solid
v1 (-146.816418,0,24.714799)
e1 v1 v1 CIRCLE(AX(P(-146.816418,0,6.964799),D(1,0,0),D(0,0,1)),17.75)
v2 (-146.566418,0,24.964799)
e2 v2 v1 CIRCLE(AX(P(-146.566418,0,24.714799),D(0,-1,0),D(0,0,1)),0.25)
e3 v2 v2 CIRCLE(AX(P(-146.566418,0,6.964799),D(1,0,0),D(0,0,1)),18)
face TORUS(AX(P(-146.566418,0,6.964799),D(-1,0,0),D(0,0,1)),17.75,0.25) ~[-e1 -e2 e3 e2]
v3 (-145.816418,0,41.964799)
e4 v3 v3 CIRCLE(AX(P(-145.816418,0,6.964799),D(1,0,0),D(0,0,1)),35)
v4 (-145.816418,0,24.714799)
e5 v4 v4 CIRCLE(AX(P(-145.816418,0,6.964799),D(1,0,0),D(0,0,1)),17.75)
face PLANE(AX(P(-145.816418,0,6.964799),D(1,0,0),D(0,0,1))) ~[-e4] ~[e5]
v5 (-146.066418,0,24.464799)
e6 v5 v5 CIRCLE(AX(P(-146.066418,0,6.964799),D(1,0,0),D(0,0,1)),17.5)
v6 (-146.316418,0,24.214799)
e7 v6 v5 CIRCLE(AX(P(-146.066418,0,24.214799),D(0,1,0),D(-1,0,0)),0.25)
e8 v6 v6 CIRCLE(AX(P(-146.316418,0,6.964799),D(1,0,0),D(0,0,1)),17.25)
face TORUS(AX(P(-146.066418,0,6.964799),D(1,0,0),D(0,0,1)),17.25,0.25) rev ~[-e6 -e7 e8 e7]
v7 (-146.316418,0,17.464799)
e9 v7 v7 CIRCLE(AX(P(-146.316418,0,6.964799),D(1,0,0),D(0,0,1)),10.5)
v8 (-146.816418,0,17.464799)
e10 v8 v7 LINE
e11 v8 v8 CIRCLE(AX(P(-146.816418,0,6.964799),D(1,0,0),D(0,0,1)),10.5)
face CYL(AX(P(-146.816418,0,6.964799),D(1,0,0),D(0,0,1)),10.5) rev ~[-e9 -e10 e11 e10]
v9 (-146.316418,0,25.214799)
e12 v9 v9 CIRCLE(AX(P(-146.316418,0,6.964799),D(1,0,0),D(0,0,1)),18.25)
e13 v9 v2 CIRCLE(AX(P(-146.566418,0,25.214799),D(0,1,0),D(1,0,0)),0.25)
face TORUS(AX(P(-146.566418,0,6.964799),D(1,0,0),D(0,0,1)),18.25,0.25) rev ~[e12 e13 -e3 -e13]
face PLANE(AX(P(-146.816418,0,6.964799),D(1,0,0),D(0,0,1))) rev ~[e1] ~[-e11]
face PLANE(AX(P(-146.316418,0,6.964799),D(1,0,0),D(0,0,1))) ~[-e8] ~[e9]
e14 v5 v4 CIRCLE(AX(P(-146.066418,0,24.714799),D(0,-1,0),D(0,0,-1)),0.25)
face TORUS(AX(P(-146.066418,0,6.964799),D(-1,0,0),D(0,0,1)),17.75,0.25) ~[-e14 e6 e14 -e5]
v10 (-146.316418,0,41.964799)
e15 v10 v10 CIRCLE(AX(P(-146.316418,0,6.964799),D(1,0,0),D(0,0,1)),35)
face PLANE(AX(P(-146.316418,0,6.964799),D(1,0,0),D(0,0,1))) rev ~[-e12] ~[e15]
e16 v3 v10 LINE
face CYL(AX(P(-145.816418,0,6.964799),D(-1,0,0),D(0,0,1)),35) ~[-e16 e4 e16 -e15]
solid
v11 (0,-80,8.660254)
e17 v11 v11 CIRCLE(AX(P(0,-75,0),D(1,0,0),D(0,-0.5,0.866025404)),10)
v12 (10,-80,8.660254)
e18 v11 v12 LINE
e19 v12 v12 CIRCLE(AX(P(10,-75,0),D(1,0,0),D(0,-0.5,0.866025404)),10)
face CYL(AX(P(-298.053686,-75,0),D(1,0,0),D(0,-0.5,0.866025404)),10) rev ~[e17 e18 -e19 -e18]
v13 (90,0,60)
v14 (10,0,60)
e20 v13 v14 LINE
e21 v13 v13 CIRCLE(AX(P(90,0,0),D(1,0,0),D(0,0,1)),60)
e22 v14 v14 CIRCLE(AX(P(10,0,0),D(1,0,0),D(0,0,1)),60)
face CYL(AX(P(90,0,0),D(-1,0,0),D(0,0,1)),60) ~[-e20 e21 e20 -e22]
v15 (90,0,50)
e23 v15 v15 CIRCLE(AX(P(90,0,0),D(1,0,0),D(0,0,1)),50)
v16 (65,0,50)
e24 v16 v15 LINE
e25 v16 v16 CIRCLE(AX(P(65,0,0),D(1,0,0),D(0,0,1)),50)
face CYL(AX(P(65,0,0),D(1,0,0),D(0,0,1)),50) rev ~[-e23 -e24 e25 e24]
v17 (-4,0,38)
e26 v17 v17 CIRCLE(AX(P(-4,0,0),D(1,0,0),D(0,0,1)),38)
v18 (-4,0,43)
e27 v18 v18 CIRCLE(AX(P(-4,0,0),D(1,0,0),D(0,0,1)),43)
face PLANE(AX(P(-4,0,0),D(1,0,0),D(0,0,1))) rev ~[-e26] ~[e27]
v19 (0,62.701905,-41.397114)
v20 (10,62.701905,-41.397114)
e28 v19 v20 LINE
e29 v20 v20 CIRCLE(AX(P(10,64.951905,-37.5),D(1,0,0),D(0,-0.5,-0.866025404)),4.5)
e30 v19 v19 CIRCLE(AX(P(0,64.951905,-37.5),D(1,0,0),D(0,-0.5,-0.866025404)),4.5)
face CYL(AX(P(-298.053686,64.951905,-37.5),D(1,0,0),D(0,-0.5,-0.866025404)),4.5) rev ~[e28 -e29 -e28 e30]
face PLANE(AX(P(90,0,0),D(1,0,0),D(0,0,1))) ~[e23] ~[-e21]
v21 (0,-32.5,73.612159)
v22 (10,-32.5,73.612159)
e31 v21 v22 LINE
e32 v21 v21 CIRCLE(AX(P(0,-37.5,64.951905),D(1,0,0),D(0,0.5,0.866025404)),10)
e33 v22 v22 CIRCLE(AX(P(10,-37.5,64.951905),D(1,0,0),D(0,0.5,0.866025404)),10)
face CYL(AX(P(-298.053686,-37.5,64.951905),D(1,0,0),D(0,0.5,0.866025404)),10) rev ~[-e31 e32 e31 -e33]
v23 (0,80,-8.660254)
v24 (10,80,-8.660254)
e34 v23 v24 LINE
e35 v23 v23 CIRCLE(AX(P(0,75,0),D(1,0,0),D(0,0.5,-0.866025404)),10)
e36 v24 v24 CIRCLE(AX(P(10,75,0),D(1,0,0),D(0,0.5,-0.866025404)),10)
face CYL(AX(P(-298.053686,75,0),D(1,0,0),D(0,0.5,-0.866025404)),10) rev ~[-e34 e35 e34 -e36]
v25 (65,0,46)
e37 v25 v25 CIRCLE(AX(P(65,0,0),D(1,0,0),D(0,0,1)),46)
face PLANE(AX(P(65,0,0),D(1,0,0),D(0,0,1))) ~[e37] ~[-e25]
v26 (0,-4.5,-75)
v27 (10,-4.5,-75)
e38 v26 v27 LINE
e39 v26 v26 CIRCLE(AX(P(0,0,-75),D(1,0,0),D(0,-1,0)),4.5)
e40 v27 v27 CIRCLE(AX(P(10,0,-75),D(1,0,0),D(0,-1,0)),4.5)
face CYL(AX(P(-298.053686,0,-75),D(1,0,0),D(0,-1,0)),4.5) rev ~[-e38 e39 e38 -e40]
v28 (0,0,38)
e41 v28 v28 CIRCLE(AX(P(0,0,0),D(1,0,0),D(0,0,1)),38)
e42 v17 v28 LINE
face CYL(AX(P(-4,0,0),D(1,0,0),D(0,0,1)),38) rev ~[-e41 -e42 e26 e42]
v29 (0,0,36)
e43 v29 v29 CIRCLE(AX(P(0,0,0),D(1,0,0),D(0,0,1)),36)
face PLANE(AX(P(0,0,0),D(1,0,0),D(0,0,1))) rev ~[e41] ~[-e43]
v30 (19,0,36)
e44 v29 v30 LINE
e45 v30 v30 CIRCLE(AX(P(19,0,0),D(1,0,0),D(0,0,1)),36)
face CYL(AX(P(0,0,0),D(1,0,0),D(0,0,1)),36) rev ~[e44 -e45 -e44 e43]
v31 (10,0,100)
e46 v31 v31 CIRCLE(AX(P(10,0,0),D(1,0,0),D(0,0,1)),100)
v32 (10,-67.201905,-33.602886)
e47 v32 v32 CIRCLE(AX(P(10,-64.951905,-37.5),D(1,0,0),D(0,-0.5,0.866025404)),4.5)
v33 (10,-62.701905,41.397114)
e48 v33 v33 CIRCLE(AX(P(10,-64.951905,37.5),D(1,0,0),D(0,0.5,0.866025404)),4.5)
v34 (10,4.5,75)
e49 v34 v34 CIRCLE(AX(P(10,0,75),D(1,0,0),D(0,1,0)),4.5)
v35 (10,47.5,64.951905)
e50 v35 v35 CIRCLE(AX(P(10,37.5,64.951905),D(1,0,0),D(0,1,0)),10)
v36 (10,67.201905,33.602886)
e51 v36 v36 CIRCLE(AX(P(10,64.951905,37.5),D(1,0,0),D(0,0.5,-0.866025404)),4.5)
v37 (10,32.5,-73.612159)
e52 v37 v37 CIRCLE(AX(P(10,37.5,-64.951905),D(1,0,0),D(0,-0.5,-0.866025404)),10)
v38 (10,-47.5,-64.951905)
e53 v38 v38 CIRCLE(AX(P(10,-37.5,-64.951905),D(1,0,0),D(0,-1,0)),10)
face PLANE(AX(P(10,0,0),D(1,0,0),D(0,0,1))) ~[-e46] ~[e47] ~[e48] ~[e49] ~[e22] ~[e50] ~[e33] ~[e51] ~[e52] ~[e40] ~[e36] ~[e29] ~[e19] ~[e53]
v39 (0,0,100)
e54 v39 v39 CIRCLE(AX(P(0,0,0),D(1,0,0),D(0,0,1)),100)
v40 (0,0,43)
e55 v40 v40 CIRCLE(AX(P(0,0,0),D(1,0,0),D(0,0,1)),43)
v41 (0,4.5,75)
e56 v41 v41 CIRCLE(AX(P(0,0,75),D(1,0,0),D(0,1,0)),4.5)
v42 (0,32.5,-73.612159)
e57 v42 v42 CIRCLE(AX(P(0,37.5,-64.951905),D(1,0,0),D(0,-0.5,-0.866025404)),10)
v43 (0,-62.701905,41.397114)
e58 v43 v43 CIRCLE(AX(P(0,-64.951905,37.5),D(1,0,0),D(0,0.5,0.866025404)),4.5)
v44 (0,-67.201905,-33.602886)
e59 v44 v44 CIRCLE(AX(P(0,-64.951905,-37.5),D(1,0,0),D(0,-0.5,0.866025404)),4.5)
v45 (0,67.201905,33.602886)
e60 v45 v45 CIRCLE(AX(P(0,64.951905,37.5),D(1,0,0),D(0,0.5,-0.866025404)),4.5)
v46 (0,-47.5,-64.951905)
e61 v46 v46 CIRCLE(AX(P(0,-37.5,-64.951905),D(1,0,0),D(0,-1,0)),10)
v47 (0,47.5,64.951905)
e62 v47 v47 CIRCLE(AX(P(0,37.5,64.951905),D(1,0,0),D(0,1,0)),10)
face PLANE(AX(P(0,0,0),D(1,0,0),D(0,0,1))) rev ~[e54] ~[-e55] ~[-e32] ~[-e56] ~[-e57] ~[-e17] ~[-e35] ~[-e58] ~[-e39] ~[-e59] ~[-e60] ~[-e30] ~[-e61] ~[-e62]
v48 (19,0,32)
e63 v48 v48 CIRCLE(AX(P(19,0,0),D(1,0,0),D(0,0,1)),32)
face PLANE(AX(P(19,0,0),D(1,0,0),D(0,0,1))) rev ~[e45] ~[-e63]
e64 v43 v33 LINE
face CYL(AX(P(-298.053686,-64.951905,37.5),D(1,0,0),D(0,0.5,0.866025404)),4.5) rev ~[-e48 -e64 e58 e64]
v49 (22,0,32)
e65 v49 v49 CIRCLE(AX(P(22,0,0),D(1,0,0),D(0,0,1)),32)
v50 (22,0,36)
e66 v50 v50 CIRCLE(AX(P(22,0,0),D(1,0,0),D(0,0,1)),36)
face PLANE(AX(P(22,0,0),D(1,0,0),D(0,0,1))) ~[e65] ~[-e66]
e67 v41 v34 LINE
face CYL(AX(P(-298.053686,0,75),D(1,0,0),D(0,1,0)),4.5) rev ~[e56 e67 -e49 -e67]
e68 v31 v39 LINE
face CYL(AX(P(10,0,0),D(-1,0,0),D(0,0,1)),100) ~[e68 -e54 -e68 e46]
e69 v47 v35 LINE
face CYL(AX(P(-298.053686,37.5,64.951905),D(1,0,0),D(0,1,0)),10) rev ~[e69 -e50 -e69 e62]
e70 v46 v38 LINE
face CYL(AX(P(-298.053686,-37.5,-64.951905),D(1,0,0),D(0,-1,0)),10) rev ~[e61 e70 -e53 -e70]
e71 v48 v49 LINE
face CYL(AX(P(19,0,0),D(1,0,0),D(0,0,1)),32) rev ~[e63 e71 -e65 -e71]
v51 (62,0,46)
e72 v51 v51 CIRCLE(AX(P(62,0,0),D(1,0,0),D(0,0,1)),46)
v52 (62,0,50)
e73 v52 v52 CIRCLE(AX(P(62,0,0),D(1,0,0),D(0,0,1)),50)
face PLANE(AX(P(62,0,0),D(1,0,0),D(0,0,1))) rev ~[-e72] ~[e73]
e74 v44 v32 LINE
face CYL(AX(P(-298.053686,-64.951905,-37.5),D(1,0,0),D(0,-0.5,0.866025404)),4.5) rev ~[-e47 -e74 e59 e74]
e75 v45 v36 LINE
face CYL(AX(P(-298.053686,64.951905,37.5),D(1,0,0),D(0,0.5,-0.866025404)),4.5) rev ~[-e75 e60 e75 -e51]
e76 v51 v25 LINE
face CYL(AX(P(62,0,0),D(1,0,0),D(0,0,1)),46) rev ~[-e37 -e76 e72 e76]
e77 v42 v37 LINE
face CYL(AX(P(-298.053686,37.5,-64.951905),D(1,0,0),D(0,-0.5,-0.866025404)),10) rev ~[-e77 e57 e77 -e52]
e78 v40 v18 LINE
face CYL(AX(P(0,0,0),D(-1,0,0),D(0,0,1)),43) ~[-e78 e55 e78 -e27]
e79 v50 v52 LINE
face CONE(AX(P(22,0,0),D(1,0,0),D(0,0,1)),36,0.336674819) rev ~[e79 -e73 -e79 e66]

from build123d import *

# Parameters (mm, degrees)
F3_D            = 9
F3_COPIES_COUNT = 6
F4_D            = 20
F4_COPIES_COUNT = 6


# Not quite as in the source:
# - a pattern or mirror of a feature is missing from the dataset's text; its kind, count and spacing are read off the source's solid


with BuildPart() as f1:
    # F0 (on Front) → F1 (revolve)
    with BuildSketch(Plane.XZ):
        Polygon((0, 38), (0, 36), (19, 36), (19, 32), (22, 32), (22, 36), (62, 50), (62, 46), (65, 46), (65, 50), (90, 50), (90, 60), (10, 60), (10, 100), (0, 100), (0, 43), (-4, 43), (-4, 38), align=None)
    revolve(axis=Axis((0.1010708511, 0, 0), (1, 0, 0)))

    # F3 (through all)
    with Locations(Plane(origin=(0, 0, 0), x_dir=(0, -1, 0), z_dir=(-1, 0, 0))):
        with Locations((0, 75)):
            f3 = Hole(F3_D / 2)

    # F3_copies: F3 ×6 about axis
    f3_copies_axis = Axis((0, 0, 0), (1, 0, 0))
    for i in range(1, F3_COPIES_COUNT):
        add(f3.rotate(f3_copies_axis, i * 360 / F3_COPIES_COUNT), mode=Mode.SUBTRACT)

    # F4 (through all)
    with Locations(Plane(origin=(0, 0, 0), x_dir=(0, -1, 0), z_dir=(-1, 0, 0))):
        with Locations((-37.5, 64.9519052838)):
            f4 = Hole(F4_D / 2)

    # F4_copies: F4 ×6 about axis
    f4_copies_axis = Axis((0, 0, 0), (1, 0, 0))
    for i in range(1, F4_COPIES_COUNT):
        add(f4.rotate(f4_copies_axis, i * 360 / F4_COPIES_COUNT), mode=Mode.SUBTRACT)


with BuildPart() as f6:
    # F5 (on Front) → F6 (revolve)
    with BuildSketch(Plane.XZ):
        with BuildLine():
            Line((-146.8164175749, 24.7147989739), (-146.8164175749, 17.4647989739))
            Line((-146.8164175749, 17.4647989739), (-146.3164175749, 17.4647989739))
            Line((-146.3164175749, 17.4647989739), (-146.3164175749, 24.2147989739))
            ThreePointArc((-146.3164175749, 24.2147989739), (-146.2431942702, 24.3915756692), (-146.0664175749, 24.4647989739))
            ThreePointArc((-146.0664175749, 24.4647989739), (-145.8896408796, 24.5380222786), (-145.8164175749, 24.7147989739))
            Line((-145.8164175749, 24.7147989739), (-145.8164175749, 41.9647989739))
            Line((-145.8164175749, 41.9647989739), (-146.3164175749, 41.9647989739))
            Line((-146.3164175749, 41.9647989739), (-146.3164175749, 25.2147989739))
            ThreePointArc((-146.3164175749, 25.2147989739), (-146.3896408796, 25.0380222786), (-146.5664175749, 24.9647989739))
            ThreePointArc((-146.5664175749, 24.9647989739), (-146.7431942702, 24.8915756692), (-146.8164175749, 24.7147989739))
        make_face()
    revolve(axis=Axis((-146.5664175749, 0, 6.9647989739), (1, 0, 0)))


solid = Compound([f1.part, f6.part])
